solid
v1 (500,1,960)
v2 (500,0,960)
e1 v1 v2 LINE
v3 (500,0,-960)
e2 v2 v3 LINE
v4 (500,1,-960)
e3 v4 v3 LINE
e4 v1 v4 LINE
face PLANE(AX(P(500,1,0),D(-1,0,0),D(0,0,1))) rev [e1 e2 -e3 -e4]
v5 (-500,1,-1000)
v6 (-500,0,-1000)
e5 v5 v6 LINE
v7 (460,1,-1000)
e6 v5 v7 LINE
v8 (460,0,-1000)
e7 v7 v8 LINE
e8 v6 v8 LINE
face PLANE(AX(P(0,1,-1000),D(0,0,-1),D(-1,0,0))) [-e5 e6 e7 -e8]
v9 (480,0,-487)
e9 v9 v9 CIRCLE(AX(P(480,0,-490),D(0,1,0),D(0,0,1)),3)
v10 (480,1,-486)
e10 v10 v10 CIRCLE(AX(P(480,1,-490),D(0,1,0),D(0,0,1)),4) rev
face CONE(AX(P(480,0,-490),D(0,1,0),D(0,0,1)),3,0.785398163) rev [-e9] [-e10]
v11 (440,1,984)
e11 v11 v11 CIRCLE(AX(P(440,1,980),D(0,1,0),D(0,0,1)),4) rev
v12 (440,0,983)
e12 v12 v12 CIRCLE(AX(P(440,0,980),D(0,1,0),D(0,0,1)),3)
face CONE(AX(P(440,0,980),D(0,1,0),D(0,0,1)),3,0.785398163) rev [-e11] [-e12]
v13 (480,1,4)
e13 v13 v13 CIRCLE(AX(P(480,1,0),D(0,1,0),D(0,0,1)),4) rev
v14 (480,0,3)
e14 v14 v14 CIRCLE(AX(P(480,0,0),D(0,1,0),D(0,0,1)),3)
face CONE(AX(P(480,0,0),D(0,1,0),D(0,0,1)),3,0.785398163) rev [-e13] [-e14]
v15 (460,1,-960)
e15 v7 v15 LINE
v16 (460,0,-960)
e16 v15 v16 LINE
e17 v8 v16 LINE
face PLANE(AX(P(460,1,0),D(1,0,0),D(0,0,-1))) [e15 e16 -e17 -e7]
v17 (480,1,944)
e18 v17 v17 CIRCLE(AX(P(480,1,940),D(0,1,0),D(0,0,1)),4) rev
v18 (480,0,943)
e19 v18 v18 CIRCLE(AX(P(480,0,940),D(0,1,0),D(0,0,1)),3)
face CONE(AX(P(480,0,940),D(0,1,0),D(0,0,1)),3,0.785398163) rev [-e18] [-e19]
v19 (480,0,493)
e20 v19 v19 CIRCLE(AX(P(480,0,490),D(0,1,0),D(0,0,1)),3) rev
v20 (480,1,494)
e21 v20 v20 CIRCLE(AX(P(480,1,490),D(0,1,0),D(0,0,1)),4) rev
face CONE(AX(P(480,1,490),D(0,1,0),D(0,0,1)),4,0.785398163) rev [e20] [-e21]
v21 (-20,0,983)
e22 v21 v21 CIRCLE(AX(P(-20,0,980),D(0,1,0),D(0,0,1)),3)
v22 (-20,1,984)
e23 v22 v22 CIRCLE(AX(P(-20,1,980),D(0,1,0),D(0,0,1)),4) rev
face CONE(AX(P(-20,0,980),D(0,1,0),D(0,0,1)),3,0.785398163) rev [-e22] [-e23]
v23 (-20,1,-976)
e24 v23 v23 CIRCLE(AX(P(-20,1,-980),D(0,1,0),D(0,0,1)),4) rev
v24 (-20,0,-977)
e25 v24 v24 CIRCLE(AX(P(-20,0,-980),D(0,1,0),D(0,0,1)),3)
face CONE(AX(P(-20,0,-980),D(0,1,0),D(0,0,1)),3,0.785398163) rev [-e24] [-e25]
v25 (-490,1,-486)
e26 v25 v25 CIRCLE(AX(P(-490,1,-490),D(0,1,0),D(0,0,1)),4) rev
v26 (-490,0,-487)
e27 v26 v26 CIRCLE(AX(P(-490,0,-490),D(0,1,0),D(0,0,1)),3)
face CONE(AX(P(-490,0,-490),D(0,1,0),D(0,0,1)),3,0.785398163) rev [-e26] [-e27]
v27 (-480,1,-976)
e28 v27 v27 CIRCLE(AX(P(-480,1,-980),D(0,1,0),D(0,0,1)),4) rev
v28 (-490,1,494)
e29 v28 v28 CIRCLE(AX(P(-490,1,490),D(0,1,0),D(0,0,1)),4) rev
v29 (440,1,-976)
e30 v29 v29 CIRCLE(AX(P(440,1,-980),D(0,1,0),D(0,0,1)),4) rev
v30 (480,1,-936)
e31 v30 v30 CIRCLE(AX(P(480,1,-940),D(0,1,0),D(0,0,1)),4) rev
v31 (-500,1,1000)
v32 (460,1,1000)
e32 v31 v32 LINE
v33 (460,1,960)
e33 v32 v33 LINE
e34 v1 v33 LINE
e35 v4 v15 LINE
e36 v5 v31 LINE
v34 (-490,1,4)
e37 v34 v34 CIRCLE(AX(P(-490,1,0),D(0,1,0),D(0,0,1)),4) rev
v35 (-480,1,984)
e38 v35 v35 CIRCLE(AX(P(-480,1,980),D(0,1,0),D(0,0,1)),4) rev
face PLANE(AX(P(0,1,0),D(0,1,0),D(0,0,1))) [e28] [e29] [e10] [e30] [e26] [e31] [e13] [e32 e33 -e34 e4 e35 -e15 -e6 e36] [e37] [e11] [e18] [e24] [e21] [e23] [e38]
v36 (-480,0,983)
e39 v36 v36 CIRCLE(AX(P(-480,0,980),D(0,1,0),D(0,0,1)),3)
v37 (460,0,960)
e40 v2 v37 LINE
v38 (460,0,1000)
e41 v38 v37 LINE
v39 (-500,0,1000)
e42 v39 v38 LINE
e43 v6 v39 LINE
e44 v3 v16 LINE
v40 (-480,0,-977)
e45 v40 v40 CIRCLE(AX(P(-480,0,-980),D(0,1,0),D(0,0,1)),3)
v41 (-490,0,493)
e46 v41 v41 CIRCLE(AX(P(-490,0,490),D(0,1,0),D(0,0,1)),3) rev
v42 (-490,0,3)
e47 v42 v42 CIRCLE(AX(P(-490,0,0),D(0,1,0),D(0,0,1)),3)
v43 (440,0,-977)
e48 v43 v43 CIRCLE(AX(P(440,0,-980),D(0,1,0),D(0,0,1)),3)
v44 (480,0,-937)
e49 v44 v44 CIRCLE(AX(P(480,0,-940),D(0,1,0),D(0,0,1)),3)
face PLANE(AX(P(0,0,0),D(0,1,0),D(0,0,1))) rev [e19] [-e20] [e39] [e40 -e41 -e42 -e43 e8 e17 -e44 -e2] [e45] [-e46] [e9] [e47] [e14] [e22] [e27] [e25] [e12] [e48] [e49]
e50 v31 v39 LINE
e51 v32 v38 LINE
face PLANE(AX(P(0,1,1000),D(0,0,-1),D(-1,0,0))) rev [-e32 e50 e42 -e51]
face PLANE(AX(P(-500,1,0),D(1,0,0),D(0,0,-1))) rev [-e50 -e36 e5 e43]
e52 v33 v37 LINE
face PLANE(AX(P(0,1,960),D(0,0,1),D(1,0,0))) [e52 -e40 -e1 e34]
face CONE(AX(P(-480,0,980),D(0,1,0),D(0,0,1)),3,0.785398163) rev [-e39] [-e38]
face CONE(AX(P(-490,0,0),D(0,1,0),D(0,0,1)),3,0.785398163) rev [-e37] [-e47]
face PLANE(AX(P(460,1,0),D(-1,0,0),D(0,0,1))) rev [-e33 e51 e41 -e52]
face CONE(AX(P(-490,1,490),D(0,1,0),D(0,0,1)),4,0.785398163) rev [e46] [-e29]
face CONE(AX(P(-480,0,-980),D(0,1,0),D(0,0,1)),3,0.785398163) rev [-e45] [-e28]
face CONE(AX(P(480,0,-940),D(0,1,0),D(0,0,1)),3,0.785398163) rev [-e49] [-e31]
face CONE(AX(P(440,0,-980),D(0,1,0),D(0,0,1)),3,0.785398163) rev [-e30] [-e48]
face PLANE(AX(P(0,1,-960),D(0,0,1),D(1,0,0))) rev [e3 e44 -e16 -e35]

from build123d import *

# Parameters (mm, degrees)
SKETCH1_R           = 3
BOSS_EXTRUDE1_DEPTH = 1
CHAMFER1_SIZE       = 1


with BuildPart() as part:
    # Sketch1 → Boss-Extrude1 (new body)
    with BuildSketch(Plane(origin=(0, 0, 0), x_dir=(1, 0, 0), z_dir=(0, 1, 0))):
        Polygon((500, -960), (460, -960), (460, -1000), (-500, -1000), (-500, 1000), (460, 1000), (460, 960), (500, 960), align=None)
        with Locations(Location((480, 0, 0), (0, 0, 270))):
            Circle(SKETCH1_R, mode=Mode.SUBTRACT)
        with Locations(Location((-490, -490, 0), (0, 0, 270))):
            Circle(SKETCH1_R, mode=Mode.SUBTRACT)
        with Locations(Location((-490, 490, 0), (0, 0, 270))):
            Circle(SKETCH1_R, mode=Mode.SUBTRACT)
        with Locations(Location((-480, 980, 0), (0, 0, 270))):
            Circle(SKETCH1_R, mode=Mode.SUBTRACT)
        with Locations(Location((-480, -980, 0), (0, 0, 270))):
            Circle(SKETCH1_R, mode=Mode.SUBTRACT)
        with Locations(Location((480, 490, 0), (0, 0, 270))):
            Circle(SKETCH1_R, mode=Mode.SUBTRACT)
        with Locations(Location((-20, -980, 0), (0, 0, 270))):
            Circle(SKETCH1_R, mode=Mode.SUBTRACT)
        with Locations(Location((-20, 980, 0), (0, 0, 270))):
            Circle(SKETCH1_R, mode=Mode.SUBTRACT)
        with Locations(Location((-490, 0, 0), (0, 0, 270))):
            Circle(SKETCH1_R, mode=Mode.SUBTRACT)
        with Locations(Location((440, -980, 0), (0, 0, 270))):
            Circle(SKETCH1_R, mode=Mode.SUBTRACT)
        with Locations(Location((480, -940, 0), (0, 0, 270))):
            Circle(SKETCH1_R, mode=Mode.SUBTRACT)
        with Locations(Location((440, 980, 0), (0, 0, 270))):
            Circle(SKETCH1_R, mode=Mode.SUBTRACT)
        with Locations(Location((480, 940, 0), (0, 0, 270))):
            Circle(SKETCH1_R, mode=Mode.SUBTRACT)
        with Locations(Location((480, -490, 0), (0, 0, 270))):
            Circle(SKETCH1_R, mode=Mode.SUBTRACT)
    extrude(amount=BOSS_EXTRUDE1_DEPTH)

    # Chamfer1
    chamfer1_edges = [part.edges().sort_by_distance(p)[0] for p in [
        (480, 1, 487),
        (480, 1, -3),
        (-490, 1, 487),
        (-490, 1, -493),
        (-480, 1, -983),
        (-480, 1, 977),
        (480, 1, -493),
        (-20, 1, 977),
        (-20, 1, -983),
        (-490, 1, -3),
        (440, 1, 977),
        (480, 1, 937),
        (440, 1, -983),
        (480, 1, -943),
    ]]
    chamfer(chamfer1_edges, length=CHAMFER1_SIZE - 0.0001)  # a hair under: the kernel refuses the full size


solid = part.part
